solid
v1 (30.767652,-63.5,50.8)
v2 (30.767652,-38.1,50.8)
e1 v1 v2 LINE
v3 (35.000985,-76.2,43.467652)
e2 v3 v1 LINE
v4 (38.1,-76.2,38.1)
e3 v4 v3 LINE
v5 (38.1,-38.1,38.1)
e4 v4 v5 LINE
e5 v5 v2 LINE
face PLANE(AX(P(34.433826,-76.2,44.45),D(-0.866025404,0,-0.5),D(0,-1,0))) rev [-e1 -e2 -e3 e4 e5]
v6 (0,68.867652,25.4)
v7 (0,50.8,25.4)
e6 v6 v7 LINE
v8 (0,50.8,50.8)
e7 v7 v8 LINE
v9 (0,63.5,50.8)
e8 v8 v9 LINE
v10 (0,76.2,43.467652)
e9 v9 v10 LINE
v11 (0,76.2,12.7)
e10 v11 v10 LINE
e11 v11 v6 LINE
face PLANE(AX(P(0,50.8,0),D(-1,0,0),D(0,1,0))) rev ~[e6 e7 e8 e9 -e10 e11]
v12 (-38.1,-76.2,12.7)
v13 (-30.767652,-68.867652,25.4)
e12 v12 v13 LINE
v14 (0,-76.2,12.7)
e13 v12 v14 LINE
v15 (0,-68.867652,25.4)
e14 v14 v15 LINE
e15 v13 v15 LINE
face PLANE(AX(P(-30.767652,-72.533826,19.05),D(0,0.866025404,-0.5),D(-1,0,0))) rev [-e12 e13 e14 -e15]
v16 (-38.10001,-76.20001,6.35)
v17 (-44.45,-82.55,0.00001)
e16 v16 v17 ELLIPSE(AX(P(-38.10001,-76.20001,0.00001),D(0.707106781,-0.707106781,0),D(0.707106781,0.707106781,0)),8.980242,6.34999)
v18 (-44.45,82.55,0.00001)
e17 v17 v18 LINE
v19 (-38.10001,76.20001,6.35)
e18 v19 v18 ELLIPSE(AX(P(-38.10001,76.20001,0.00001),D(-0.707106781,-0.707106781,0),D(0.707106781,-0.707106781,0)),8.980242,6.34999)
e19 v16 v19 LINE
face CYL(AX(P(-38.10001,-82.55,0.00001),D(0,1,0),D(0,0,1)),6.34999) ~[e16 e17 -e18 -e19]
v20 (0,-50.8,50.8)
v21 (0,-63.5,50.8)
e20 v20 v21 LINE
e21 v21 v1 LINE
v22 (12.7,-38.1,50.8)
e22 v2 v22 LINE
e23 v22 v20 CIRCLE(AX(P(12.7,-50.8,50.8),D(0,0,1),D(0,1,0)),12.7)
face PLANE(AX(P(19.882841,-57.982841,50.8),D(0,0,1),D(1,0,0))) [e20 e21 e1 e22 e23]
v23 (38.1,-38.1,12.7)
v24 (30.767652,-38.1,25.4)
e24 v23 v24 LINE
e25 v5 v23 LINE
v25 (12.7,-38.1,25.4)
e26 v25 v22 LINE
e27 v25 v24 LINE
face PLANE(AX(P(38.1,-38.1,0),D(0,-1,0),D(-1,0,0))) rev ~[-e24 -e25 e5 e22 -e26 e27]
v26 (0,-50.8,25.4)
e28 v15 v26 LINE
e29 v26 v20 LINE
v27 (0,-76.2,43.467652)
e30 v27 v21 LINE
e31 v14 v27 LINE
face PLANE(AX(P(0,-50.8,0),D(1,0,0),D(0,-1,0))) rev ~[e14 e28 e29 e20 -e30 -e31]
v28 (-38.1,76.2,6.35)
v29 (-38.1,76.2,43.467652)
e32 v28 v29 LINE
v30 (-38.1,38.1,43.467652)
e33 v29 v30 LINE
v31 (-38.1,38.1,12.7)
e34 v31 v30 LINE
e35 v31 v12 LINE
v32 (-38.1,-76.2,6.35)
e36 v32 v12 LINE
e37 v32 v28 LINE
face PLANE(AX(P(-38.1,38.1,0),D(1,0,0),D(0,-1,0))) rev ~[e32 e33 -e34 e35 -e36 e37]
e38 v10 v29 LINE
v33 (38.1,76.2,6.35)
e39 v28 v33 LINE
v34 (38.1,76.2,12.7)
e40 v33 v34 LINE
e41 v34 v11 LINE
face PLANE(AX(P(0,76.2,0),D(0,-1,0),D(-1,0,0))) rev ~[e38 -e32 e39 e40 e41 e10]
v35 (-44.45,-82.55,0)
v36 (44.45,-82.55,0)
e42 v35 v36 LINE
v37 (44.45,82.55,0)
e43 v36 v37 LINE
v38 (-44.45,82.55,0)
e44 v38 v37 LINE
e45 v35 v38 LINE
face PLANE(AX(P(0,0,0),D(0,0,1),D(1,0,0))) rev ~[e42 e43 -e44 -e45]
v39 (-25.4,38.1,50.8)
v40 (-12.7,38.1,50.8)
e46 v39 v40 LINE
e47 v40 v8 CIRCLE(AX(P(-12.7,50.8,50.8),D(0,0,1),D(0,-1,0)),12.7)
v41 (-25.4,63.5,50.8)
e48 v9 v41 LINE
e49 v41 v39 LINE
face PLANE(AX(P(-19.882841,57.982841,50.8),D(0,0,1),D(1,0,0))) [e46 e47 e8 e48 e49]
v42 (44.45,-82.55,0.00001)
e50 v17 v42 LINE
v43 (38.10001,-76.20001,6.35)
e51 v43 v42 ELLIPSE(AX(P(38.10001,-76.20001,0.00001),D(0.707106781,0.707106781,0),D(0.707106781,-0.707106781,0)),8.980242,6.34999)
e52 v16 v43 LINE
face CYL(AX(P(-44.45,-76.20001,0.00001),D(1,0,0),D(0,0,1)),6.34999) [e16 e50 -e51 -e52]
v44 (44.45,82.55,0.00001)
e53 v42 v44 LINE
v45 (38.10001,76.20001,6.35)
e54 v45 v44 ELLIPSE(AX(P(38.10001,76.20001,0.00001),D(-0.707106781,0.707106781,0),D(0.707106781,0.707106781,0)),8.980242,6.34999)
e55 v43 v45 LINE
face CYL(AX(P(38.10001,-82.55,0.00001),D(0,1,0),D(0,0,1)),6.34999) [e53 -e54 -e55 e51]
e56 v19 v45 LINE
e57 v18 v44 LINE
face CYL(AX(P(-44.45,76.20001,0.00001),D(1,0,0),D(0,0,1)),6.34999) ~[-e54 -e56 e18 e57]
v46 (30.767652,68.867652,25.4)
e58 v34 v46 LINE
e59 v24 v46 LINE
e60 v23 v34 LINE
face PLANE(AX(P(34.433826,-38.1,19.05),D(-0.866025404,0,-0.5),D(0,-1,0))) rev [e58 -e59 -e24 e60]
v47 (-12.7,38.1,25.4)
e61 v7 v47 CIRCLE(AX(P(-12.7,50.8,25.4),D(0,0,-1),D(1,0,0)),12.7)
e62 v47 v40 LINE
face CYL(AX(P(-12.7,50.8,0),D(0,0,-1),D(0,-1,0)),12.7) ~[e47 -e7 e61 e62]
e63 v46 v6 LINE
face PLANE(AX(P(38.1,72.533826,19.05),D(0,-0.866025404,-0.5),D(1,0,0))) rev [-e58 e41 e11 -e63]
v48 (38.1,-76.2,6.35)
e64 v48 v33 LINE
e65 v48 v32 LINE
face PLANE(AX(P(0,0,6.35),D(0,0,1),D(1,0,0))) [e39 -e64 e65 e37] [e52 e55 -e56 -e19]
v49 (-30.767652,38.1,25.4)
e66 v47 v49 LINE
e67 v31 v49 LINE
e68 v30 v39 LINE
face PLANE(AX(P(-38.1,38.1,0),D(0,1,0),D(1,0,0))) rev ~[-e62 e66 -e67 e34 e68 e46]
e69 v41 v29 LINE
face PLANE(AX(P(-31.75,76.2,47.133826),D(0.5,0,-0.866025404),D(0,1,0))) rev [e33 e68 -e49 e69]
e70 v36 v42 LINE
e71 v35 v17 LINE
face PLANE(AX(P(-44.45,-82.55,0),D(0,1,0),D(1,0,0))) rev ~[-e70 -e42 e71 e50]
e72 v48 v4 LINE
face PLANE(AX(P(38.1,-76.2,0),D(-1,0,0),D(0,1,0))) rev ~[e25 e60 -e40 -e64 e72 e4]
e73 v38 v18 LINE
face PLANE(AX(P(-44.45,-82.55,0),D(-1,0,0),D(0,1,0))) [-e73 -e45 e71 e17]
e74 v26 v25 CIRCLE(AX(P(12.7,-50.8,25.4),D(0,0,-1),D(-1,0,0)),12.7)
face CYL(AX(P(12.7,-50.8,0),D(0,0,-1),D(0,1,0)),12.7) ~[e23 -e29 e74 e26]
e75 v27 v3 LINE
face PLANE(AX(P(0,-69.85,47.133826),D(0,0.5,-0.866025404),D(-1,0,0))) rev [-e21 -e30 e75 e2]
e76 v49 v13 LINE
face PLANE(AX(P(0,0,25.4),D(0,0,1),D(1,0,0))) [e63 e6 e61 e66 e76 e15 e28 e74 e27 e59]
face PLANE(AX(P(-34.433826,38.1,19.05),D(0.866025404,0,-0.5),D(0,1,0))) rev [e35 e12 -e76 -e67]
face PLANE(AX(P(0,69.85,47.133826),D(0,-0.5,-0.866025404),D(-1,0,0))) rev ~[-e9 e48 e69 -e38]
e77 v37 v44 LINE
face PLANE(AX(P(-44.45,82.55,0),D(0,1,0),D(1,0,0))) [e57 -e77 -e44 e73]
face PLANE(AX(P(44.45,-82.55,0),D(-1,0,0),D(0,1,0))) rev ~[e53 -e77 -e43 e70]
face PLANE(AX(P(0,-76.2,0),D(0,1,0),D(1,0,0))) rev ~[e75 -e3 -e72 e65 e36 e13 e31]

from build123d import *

# Parameters (mm, degrees)
F0_W        = 88.9
F0_H        = 165.1
F1_DEPTH    = 6.35
F2_DEPTH    = 25.4
F3_DEPTH    = 50.8
F4_R        = 6.34999
F5_C1_SIZE2 = 12.7
F5_C1_SIZE  = 7.3323484187
F5_C2_SIZE2 = 7.3323484187
F5_C2_SIZE  = 12.7
F5_C3_SIZE2 = 7.3323484187
F5_C3_SIZE  = 12.7
F5_C4_SIZE2 = 7.3323484187
F5_C4_SIZE  = 12.7
F5_C5_SIZE2 = 7.3323484187
F5_C5_SIZE  = 12.7
F5_C6_SIZE2 = 7.3323484187
F5_C6_SIZE  = 12.7
F5_C7_SIZE2 = 12.7
F5_C7_SIZE  = 7.3323484187
F6_SIZE2    = 7.3323484187
F6_SIZE     = 12.7


# Not quite as in the source:
# - a fillet or chamfer is up to 0.001 mm smaller than in the source, because OpenCascade refuses the exact size


with BuildPart() as f1:
    # F0 (on Top) → F1 (new body)
    with BuildSketch(Plane.XY):
        Rectangle(F0_W, F0_H)
        Polygon((-38.1, 38.1), (-38.1, 76.2), (0, 76.2), (38.1, 76.2), (38.1, -38.1), (38.1, -76.2), (0, -76.2), (-38.1, -76.2), align=None, mode=Mode.SUBTRACT)
    extrude(amount=F1_DEPTH)

    # F0 (on Top) → F2 (join)
    with BuildSketch(Plane.XY):
        with BuildLine():
            Line((38.1, 76.2), (0, 76.2))
            Line((0, 76.2), (0, 50.8))
            ThreePointArc((0, 50.8), (-3.7197438789, 41.8197438789), (-12.7, 38.1))
            Line((-12.7, 38.1), (-38.1, 38.1))
            Line((-38.1, 38.1), (-38.1, -76.2))
            Line((-38.1, -76.2), (0, -76.2))
            Line((0, -76.2), (0, -50.8))
            ThreePointArc((0, -50.8), (3.7197438789, -41.8197438789), (12.7, -38.1))
            Line((12.7, -38.1), (38.1, -38.1))
            Line((38.1, -38.1), (38.1, 76.2))
        make_face()
    extrude(amount=F2_DEPTH)

    # F0 (on Top) → F3 (join)
    with BuildSketch(Plane.XY):
        with BuildLine():
            Line((38.1, -76.2), (38.1, -38.1))
            Line((38.1, -38.1), (12.7, -38.1))
            ThreePointArc((12.7, -38.1), (3.7197438789, -41.8197438789), (0, -50.8))
            Line((0, -50.8), (0, -76.2))
            Line((0, -76.2), (38.1, -76.2))
        make_face()
        with BuildLine():
            Line((0, 76.2), (-38.1, 76.2))
            Line((-38.1, 76.2), (-38.1, 38.1))
            Line((-38.1, 38.1), (-12.7, 38.1))
            ThreePointArc((-12.7, 38.1), (-3.7197438789, 41.8197438789), (0, 50.8))
            Line((0, 50.8), (0, 76.2))
        make_face()
    extrude(amount=F3_DEPTH)

    # F4 (radius 6.35 in the source; OpenCascade refuses exactly that, so slightly less here)
    f4_edges = [f1.edges().sort_by_distance(p)[0] for p in [
        (0, -82.55, 6.35),
        (44.45, 0, 6.35),
        (0, 82.55, 6.35),
        (-44.45, 0, 6.35),
    ]]
    fillet(f4_edges, radius=F4_R)

    # F5: chamfer of 12.7 x 7.3323484187 on 7 edges, made by hand

    # F5_c1
    f5_c1_edges = [f1.edges().sort_by_distance(p)[0] for p in [
        (-38.1, 57.15, 50.8),
    ]]
    f5_c1_side = f1.faces().sort_by_distance((-38.1, 57.15, 50.6533530316))[0]
    chamfer(f5_c1_edges, length=F5_C1_SIZE, length2=F5_C1_SIZE2, reference=f5_c1_side)

    # F5_c2
    f5_c2_edges = [f1.edges().sort_by_distance(p)[0] for p in [
        (-38.1, -19.05, 25.4),
    ]]
    f5_c2_side = f1.faces().sort_by_distance((-38.1, -19.05, 25.2533530316))[0]
    chamfer(f5_c2_edges, length=F5_C2_SIZE, length2=F5_C2_SIZE2, reference=f5_c2_side)

    # F5_c3
    f5_c3_edges = [f1.edges().sort_by_distance(p)[0] for p in [
        (19.05, 76.2, 25.4),
    ]]
    f5_c3_side = f1.faces().sort_by_distance((19.05, 76.2, 25.2533530316))[0]
    chamfer(f5_c3_edges, length=F5_C3_SIZE, length2=F5_C3_SIZE2, reference=f5_c3_side)

    # F5_c4
    f5_c4_edges = [f1.edges().sort_by_distance(p)[0] for p in [
        (38.1, -57.15, 50.8),
    ]]
    f5_c4_side = f1.faces().sort_by_distance((38.1, -57.15, 50.6533530316))[0]
    chamfer(f5_c4_edges, length=F5_C4_SIZE, length2=F5_C4_SIZE2, reference=f5_c4_side)

    # F5_c5
    f5_c5_edges = [f1.edges().sort_by_distance(p)[0] for p in [
        (38.1, 15.3838257906, 25.4),
    ]]
    f5_c5_side = f1.faces().sort_by_distance((38.1, 15.3838257906, 25.2533530316))[0]
    chamfer(f5_c5_edges, length=F5_C5_SIZE, length2=F5_C5_SIZE2, reference=f5_c5_side)

    # F5_c6
    f5_c6_edges = [f1.edges().sort_by_distance(p)[0] for p in [
        (-15.3838257906, -76.2, 25.4),
    ]]
    f5_c6_side = f1.faces().sort_by_distance((-15.3838257906, -76.2, 25.2533530316))[0]
    chamfer(f5_c6_edges, length=F5_C6_SIZE, length2=F5_C6_SIZE2, reference=f5_c6_side)

    # F5_c7
    f5_c7_edges = [f1.edges().sort_by_distance(p)[0] for p in [
        (15.3838257906, -76.2, 50.8),
    ]]
    f5_c7_side = f1.faces().sort_by_distance((15.3838257906, -76.2, 50.6533530316))[0]
    chamfer(f5_c7_edges, length=F5_C7_SIZE, length2=F5_C7_SIZE2, reference=f5_c7_side)

    # F6
    f6_edges = [f1.edges().sort_by_distance(p)[0] for p in [
        (-12.7, 76.2, 50.8),
    ]]
    f6_side = f1.faces().sort_by_distance((-13.065864, 57.751409, 50.8))[0]
    chamfer(f6_edges, length=F6_SIZE, length2=F6_SIZE2, reference=f6_side)


solid = f1.part
